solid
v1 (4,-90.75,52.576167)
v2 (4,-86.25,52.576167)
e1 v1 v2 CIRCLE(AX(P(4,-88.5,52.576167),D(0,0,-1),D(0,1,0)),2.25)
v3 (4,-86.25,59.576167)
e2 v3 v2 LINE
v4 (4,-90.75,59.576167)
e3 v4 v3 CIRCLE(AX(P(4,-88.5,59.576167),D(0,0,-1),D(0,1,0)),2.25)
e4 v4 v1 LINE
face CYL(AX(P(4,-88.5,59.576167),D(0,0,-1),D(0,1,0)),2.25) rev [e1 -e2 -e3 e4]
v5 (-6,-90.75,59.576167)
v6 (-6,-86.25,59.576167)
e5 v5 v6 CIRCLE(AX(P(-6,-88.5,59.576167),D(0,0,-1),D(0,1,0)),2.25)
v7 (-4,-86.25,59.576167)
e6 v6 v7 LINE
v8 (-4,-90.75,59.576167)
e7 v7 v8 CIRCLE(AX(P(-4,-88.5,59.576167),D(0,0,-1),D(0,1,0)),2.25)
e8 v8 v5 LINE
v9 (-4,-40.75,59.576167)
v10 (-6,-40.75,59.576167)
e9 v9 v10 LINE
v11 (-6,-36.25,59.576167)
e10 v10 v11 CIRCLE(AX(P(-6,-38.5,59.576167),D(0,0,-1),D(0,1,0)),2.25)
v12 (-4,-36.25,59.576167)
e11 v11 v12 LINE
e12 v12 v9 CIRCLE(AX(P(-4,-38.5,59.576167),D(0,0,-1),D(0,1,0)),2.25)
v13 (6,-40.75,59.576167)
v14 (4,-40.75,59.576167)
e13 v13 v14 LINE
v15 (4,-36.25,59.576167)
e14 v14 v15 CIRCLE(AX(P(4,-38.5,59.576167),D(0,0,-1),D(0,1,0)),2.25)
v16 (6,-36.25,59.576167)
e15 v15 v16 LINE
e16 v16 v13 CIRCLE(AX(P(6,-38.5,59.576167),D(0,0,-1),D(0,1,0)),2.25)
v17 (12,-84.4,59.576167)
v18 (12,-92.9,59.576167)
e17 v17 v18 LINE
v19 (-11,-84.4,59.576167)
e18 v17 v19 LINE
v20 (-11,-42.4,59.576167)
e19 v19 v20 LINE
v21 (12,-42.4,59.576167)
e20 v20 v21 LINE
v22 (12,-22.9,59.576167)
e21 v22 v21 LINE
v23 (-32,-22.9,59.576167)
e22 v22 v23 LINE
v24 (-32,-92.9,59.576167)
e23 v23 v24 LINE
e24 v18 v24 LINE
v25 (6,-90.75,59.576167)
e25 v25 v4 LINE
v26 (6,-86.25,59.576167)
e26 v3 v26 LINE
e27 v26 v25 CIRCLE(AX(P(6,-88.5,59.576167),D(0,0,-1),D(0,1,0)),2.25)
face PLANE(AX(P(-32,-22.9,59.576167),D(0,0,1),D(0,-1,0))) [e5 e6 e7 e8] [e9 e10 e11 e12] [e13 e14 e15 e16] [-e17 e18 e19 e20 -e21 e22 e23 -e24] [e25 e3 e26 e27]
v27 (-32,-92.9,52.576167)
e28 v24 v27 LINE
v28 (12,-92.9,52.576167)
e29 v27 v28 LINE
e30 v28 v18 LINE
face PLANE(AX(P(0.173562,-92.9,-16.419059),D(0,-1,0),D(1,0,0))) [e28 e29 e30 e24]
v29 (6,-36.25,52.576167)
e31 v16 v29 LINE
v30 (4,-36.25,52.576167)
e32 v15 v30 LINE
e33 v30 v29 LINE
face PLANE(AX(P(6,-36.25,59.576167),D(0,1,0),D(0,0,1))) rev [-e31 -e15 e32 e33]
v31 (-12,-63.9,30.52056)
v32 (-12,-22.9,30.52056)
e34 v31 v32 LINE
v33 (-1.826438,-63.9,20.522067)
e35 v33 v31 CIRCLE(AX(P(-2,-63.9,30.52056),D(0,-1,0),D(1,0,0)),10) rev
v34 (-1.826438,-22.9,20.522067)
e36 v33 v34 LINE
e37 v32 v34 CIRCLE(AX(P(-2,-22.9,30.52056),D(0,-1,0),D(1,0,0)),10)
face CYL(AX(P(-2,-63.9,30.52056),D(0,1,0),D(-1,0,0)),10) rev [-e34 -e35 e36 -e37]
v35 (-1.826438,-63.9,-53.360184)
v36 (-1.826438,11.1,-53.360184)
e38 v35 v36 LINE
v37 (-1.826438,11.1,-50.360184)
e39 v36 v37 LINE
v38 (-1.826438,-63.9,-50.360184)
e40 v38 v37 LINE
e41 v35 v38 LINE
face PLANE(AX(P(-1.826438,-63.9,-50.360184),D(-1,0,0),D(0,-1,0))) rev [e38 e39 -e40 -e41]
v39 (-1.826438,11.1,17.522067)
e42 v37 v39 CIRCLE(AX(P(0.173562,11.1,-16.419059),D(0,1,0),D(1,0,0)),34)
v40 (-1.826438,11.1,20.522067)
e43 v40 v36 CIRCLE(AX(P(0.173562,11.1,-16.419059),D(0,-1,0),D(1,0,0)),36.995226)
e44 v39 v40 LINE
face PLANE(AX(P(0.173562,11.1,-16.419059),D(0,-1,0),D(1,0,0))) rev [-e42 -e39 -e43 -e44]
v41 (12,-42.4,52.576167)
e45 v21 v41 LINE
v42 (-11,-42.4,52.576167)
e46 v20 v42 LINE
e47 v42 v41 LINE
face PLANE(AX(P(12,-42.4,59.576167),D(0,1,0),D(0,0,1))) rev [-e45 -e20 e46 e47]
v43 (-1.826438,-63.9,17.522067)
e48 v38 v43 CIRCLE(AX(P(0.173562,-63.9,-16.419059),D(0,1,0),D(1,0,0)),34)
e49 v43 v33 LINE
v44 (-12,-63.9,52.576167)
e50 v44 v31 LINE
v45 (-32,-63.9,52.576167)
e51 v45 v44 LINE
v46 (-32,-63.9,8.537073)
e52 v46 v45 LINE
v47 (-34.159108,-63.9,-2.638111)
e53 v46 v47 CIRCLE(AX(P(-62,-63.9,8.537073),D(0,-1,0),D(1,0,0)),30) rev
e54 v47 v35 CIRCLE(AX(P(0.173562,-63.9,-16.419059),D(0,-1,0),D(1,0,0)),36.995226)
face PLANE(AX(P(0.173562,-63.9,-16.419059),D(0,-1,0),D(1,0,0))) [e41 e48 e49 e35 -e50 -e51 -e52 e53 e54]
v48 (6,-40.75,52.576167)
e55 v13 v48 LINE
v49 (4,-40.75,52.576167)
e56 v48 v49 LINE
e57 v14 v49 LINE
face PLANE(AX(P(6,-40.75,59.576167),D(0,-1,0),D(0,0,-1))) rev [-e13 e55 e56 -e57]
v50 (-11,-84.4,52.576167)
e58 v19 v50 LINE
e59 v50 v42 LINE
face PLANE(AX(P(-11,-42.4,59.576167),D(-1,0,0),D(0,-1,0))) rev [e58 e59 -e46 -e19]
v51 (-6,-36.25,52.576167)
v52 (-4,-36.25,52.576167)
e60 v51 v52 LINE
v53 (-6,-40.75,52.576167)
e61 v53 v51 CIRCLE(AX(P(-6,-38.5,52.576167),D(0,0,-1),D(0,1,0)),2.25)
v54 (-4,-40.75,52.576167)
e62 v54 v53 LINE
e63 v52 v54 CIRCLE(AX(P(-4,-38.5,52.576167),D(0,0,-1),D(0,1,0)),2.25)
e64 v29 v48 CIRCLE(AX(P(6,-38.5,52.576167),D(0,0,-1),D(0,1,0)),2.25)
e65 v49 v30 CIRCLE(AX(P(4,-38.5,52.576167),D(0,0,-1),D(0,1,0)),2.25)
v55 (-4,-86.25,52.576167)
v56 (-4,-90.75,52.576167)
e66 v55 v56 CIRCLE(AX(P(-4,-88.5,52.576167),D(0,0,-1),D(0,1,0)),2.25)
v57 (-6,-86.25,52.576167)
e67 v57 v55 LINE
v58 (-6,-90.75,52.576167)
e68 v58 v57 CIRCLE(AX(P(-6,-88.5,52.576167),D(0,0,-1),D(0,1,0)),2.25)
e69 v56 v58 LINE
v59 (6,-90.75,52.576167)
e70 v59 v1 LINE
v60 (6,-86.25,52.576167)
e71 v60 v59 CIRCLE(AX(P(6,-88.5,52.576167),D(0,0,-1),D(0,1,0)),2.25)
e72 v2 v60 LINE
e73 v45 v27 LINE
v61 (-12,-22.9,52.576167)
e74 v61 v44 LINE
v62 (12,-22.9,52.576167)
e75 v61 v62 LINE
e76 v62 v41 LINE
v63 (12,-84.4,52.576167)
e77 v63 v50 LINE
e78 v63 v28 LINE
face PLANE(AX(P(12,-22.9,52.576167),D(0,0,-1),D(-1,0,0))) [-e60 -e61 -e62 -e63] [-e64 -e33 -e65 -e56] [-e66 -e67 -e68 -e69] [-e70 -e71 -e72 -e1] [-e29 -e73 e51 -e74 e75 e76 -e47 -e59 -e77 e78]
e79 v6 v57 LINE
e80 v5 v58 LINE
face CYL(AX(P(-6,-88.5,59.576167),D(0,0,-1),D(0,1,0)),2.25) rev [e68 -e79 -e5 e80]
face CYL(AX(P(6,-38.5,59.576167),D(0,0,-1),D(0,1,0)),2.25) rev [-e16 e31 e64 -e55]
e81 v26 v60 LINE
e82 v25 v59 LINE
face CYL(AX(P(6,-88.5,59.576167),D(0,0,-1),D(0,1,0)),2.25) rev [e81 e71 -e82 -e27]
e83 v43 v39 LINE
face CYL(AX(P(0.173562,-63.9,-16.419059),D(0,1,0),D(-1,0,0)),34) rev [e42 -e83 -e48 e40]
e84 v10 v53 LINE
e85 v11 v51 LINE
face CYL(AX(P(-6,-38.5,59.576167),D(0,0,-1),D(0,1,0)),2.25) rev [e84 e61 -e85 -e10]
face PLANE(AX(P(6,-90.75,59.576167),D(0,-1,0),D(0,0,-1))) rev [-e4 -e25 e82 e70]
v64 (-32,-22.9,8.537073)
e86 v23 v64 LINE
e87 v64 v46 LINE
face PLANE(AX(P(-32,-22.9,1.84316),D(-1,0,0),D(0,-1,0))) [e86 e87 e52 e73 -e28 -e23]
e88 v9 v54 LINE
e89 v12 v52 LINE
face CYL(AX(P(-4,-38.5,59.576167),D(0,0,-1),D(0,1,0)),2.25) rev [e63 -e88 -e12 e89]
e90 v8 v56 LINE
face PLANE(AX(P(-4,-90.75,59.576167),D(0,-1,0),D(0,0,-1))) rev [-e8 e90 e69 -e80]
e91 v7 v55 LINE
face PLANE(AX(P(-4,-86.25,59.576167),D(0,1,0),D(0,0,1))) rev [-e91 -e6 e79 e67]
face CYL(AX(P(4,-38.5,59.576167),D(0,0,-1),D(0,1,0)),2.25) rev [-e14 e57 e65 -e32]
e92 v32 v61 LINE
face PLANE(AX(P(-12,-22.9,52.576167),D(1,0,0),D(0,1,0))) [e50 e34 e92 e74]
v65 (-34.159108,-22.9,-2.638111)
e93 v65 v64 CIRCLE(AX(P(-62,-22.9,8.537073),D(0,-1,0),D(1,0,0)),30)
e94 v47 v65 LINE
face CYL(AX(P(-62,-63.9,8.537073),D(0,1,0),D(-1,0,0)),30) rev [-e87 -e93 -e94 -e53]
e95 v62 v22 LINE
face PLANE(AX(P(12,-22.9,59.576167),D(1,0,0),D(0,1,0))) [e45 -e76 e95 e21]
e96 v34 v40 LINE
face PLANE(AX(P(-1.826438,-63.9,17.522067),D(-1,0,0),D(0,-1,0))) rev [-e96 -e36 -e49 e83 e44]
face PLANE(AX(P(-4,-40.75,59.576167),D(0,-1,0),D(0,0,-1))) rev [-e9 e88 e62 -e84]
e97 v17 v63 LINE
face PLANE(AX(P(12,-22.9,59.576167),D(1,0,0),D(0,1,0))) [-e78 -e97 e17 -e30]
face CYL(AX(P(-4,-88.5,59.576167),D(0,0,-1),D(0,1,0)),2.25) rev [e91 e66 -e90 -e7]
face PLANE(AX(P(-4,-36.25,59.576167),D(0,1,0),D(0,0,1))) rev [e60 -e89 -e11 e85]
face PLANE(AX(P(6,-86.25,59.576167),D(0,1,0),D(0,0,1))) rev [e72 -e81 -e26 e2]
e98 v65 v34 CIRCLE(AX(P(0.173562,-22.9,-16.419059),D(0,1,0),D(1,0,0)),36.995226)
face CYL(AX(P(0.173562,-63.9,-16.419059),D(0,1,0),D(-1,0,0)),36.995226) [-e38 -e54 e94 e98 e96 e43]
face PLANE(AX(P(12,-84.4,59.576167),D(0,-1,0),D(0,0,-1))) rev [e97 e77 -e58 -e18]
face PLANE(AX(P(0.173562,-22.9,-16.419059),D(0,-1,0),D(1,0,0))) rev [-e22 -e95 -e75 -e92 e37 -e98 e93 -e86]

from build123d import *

# Parameters (mm, degrees)
BOSS_EXTRU_1_DEPTH      = 75
BOSS_EXTRU_2_START      = -70
BOSS_EXTRU_2_DEPTH      = 70
ENL_V_START             = -29
ENL_V_MAT_EXTRU_1_DEPTH = 29
CONG_1_R                = 30
CONG_2_R                = 10
ESQUISSE5_W             = 23
ESQUISSE5_H             = 42
ENL_V_MAT_EXTRU_2_DEPTH = 146.632261285


with BuildPart() as part:
    # Esquisse1 → Boss.-Extru.1 (new body)
    with BuildSketch(Plane(origin=(0, 11.1, 0), x_dir=(0, 0, 1), z_dir=(0, -1, 0))):
        with BuildLine():
            Line((-50.360184389, 1.826437931), (-53.360184389, 1.826437931))
            ThreePointArc((-53.360184389, 1.826437931), (-16.419058892, 36.821664014), (20.522066605, 1.826437931))
            Line((20.522066605, 1.826437931), (17.522066605, 1.826437931))
            ThreePointArc((17.522066605, 1.826437931), (-16.419058892, 33.826437931), (-50.360184389, 1.826437931))
        make_face()
    extrude(amount=BOSS_EXTRU_1_DEPTH)

    # Esquisse3 → Boss.-Extru.2 (add)
    with BuildSketch(Plane(origin=(0, -92.9, 0), x_dir=(-1, 0, 0), z_dir=(0, -1, 0)).offset(BOSS_EXTRU_2_START)):
        with BuildLine():
            Line((32, -1.84316049), (32, -59.576167192))
            Line((32, -59.576167192), (-12, -59.576167192))
            Line((-12, -59.576167192), (-12, -52.576167192))
            Line((-12, -52.576167192), (12, -52.576167192))
            Line((12, -52.576167192), (12, -18.515896948))
            ThreePointArc((12, -18.515896948), (23.515293751, -11.997219241), (32, -1.84316049))
        make_face()
    extrude(amount=BOSS_EXTRU_2_DEPTH)

    # Esquisse4 → Enlèv. mat.-Extru.1 (cut)
    with BuildSketch(Plane.XZ.offset(92.9).offset(ENL_V_START)):
        with BuildLine():
            Line((-12, 18.515896948), (-12, 52.576167192))
            Line((-12, 52.576167192), (-32, 52.576167192))
            Line((-32, 52.576167192), (-32, 1.84316049))
            ThreePointArc((-32, 1.84316049), (-23.515293751, 11.997219241), (-12, 18.515896948))
        make_face()
    extrude(amount=ENL_V_MAT_EXTRU_1_DEPTH, mode=Mode.SUBTRACT)

    # Congé1
    cong_1_edges = [part.edges().sort_by_distance(p)[0] for p in [
        (-32, -43.4, 1.84316049),
    ]]
    fillet(cong_1_edges, radius=CONG_1_R)

    # Congé2
    # the kernel refuses this fillet: 10 mm, written as the material it adds along each edge
    with BuildSketch(Plane(origin=(-12, -22.9, 18.515896948), x_dir=(0, 0, 1), z_dir=(0, -1, 0))) as cong_2_piece_1_section:
        with BuildLine():
            CenterArc((12.004663354, -10), CONG_2_R, 90, 90.994487339)
            Line((2.006169657, -10.173562069), (1.806199783, -10.177033311))
            ThreePointArc((1.806199783, -10.177033311), (1.165077614, -5.054836961), (-0.188861967, -0.06581153))
            Line((-0.188861967, -0.06581153), (0, 0.2))
            Line((0, 0.2), (12.004663354, 0.2))
            Line((12.004663354, 0.2), (12.004663354, 0))
        make_face()
    cong_2_piece_1 = extrude(amount=41, mode=Mode.PRIVATE)
    cong_2_piece_1 = split(cong_2_piece_1, bisect_by=Plane(origin=(-1.826437931, -43.4, 22.039675227), z_dir=(-1, 0, 0)), keep=Keep.TOP, mode=Mode.PRIVATE)
    add(cong_2_piece_1)

    # Esquisse5 → Enlèv. mat.-Extru.2 (cut, through all)
    with BuildSketch(Plane(origin=(0, 0, 52.576167192), x_dir=(-1, 0, 0), z_dir=(0, 0, -1))):
        with Locations((-0.5, -63.4)):
            Rectangle(ESQUISSE5_W, ESQUISSE5_H)
        with BuildLine():
            Line((-6, -36.25), (-4, -36.25))
            ThreePointArc((-4, -36.25), (-1.75, -38.5), (-4, -40.75))
            Line((-4, -40.75), (-6, -40.75))
            ThreePointArc((-6, -40.75), (-8.25, -38.5), (-6, -36.25))
        make_face()
        with BuildLine():
            Line((4, -36.25), (6, -36.25))
            ThreePointArc((6, -36.25), (8.25, -38.5), (6, -40.75))
            Line((6, -40.75), (4, -40.75))
            ThreePointArc((4, -40.75), (1.75, -38.5), (4, -36.25))
        make_face()
        with BuildLine():
            Line((-6, -86.25), (-4, -86.25))
            ThreePointArc((-4, -86.25), (-1.75, -88.5), (-4, -90.75))
            Line((-4, -90.75), (-6, -90.75))
            ThreePointArc((-6, -90.75), (-8.25, -88.5), (-6, -86.25))
        make_face()
        with BuildLine():
            Line((4, -86.25), (6, -86.25))
            ThreePointArc((6, -86.25), (8.25, -88.5), (6, -90.75))
            Line((6, -90.75), (4, -90.75))
            ThreePointArc((4, -90.75), (1.75, -88.5), (4, -86.25))
        make_face()
    extrude(amount=-ENL_V_MAT_EXTRU_2_DEPTH, mode=Mode.SUBTRACT)


solid = part.part
